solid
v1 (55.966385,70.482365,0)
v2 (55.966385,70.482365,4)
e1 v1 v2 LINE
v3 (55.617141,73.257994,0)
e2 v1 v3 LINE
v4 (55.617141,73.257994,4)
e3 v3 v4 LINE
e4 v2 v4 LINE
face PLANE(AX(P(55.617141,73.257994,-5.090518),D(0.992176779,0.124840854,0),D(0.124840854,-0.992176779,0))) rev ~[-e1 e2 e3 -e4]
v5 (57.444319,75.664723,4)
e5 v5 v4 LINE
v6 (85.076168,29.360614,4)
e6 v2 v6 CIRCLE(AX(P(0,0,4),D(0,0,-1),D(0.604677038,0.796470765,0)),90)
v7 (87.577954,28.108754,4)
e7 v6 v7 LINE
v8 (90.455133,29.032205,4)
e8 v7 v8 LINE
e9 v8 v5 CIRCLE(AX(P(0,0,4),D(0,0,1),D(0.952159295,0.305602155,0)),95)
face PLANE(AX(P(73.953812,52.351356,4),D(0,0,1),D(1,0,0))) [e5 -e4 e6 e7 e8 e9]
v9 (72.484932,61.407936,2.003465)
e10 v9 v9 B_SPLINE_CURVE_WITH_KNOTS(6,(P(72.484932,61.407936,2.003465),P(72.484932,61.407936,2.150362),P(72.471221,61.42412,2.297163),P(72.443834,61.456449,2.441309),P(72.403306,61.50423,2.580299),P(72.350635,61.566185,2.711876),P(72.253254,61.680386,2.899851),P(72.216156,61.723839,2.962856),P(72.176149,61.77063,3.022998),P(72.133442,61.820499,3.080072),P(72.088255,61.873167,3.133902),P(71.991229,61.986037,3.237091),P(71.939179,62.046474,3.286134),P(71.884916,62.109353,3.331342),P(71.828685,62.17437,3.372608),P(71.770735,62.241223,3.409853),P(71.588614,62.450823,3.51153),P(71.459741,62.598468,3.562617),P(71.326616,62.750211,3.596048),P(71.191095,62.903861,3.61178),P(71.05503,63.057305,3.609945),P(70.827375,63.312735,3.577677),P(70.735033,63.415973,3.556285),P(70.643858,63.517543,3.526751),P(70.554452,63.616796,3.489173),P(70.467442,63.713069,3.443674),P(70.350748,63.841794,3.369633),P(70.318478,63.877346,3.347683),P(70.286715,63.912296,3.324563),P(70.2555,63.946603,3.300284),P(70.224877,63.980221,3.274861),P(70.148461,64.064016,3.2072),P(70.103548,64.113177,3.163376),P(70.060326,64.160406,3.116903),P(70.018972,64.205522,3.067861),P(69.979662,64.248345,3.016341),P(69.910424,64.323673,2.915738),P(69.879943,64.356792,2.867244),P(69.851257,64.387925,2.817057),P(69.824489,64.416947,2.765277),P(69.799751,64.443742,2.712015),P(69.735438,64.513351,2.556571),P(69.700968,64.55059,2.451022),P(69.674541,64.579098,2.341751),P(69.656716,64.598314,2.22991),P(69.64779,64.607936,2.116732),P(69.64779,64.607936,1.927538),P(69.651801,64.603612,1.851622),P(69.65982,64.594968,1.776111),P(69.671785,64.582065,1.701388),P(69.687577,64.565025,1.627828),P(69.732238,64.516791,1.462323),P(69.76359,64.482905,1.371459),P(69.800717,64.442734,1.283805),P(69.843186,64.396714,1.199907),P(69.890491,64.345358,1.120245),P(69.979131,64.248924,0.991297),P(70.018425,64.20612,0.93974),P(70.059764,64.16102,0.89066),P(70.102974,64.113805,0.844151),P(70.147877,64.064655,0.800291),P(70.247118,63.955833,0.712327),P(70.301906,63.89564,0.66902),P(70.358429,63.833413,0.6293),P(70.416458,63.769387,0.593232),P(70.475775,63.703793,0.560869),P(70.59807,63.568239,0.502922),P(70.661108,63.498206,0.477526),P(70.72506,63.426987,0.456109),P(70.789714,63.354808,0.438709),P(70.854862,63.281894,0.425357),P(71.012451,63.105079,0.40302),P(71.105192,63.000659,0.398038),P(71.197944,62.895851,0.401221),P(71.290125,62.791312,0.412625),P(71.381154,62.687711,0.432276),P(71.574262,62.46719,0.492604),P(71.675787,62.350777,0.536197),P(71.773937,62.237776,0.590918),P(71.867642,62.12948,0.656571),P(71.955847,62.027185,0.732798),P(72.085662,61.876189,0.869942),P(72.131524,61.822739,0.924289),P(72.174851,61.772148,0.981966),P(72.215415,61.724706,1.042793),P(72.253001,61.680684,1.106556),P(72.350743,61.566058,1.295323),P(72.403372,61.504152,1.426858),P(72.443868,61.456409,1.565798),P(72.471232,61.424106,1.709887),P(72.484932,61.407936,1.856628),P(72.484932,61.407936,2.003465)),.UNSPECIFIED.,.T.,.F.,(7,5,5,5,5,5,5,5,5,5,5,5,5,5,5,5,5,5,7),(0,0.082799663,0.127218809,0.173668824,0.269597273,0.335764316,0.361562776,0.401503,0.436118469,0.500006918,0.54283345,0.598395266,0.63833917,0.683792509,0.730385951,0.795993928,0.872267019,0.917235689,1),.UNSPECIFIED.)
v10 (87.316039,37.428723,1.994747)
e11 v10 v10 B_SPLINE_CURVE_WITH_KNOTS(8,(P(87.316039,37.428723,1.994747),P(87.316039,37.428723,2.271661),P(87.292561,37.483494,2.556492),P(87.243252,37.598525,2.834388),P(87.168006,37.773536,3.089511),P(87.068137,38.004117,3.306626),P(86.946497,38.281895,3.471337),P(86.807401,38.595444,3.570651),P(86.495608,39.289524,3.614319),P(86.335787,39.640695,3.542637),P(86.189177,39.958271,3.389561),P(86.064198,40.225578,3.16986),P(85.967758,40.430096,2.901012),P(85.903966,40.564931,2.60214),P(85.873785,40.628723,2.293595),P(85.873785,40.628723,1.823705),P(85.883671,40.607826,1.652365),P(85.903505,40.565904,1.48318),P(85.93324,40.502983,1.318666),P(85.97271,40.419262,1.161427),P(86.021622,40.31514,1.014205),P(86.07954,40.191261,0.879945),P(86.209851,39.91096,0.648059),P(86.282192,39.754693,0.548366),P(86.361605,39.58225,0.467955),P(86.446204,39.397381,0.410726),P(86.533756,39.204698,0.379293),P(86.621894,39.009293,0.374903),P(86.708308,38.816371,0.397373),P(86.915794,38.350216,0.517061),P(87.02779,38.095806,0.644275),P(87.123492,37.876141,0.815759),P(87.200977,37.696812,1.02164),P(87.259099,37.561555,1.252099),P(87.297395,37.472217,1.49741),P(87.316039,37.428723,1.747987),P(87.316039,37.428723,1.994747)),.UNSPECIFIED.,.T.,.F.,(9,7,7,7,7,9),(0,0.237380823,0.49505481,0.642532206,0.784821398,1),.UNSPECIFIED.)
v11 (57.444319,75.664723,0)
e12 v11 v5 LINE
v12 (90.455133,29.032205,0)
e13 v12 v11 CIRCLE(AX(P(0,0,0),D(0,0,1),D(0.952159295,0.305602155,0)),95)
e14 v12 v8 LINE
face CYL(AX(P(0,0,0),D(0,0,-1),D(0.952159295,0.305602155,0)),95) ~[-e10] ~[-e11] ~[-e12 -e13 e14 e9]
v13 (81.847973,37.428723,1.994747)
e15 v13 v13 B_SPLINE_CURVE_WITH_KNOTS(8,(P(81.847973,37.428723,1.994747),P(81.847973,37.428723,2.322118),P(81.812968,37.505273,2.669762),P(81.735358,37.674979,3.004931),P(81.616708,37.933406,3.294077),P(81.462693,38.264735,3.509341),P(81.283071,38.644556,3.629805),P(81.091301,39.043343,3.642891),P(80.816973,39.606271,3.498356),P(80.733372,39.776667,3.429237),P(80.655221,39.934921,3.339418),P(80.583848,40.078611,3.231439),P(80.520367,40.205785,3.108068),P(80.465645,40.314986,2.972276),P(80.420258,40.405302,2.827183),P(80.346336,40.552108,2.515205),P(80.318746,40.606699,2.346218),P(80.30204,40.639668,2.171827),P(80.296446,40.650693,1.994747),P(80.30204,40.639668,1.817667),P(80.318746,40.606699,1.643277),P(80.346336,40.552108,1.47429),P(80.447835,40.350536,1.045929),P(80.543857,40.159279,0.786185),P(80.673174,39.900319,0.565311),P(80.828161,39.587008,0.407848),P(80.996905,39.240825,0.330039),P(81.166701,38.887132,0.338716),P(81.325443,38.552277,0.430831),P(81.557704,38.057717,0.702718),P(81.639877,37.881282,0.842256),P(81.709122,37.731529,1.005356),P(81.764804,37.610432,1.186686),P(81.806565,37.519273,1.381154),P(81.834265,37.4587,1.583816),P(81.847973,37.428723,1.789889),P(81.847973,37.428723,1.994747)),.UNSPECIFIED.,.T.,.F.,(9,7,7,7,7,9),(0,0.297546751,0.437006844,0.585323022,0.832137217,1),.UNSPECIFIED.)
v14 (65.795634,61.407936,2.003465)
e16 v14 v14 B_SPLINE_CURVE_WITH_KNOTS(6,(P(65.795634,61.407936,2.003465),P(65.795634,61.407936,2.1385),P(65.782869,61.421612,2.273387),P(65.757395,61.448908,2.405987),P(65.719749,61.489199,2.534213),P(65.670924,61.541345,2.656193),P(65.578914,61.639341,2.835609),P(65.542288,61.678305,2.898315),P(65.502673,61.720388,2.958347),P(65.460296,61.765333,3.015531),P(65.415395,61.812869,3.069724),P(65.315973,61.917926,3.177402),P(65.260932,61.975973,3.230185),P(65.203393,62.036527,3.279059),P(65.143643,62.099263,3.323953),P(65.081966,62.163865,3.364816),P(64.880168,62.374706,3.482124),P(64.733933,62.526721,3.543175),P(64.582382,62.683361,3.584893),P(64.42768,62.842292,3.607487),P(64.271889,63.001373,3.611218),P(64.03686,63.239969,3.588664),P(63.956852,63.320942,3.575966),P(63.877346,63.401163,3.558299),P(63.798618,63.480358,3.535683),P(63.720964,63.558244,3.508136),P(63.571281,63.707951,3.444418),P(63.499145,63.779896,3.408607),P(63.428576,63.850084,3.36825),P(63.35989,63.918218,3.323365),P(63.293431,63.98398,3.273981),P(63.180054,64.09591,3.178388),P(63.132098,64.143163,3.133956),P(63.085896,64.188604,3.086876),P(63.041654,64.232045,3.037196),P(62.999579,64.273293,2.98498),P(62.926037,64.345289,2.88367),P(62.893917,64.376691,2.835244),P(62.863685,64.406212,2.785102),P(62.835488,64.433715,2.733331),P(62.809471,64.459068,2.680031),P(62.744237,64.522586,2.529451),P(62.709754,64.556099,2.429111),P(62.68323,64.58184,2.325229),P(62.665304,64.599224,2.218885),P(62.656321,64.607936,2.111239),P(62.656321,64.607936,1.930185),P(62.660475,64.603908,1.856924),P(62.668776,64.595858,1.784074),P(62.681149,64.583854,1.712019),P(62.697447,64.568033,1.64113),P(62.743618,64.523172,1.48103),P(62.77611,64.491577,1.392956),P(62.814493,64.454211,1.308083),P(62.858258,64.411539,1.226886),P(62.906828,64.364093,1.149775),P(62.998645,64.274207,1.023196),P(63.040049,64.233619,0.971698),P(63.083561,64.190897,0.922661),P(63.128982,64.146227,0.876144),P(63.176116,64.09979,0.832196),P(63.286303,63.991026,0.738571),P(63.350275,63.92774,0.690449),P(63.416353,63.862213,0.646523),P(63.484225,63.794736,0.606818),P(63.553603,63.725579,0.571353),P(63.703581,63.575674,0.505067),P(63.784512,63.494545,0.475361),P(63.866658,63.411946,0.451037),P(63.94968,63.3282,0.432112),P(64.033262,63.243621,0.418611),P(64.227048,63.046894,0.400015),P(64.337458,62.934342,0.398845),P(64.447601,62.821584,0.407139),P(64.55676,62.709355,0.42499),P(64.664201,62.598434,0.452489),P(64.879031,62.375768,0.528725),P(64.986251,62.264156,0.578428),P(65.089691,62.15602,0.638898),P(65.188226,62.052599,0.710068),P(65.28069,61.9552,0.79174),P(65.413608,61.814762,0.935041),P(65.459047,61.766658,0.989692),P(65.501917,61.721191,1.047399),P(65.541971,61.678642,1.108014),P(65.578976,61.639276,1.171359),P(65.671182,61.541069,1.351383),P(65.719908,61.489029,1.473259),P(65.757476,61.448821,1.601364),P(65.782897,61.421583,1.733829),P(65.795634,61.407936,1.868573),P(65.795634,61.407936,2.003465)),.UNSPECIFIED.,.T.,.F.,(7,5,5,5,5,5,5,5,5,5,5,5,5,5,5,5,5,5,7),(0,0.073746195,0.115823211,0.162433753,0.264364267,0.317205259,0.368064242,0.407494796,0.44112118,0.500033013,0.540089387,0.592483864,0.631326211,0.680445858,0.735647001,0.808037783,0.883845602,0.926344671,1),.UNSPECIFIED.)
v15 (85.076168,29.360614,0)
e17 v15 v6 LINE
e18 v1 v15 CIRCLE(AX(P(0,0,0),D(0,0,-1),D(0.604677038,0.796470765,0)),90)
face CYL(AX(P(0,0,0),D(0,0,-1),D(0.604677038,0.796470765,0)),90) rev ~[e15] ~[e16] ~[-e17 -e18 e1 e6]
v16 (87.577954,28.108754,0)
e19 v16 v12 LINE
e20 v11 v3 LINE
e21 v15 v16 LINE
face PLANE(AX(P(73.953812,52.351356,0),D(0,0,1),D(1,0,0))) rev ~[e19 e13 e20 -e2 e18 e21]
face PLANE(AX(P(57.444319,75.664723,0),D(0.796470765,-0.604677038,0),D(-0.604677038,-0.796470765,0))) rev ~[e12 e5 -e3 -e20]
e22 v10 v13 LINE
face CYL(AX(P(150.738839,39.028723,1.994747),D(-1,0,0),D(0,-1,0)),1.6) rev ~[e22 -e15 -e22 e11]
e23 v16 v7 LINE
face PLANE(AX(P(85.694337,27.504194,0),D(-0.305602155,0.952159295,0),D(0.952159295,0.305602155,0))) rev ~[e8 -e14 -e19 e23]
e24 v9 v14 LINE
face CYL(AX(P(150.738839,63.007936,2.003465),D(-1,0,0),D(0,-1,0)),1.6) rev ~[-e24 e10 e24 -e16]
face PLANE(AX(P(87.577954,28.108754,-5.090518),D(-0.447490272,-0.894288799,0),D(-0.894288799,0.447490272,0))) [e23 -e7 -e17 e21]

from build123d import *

# Parameters (mm, degrees)
F1_DEPTH    = 4
F4_D        = 3.2
F5_T1_DEPTH = 14.1810362517


# Not quite as in the source:
# - a fillet or chamfer that OpenCascade refuses, or shapes differently, is made with other operations: its cross-section is extruded or revolved along the edge and cut away or added


with BuildPart() as f1:
    # F0 (on Top) → F1 (new body)
    with BuildSketch(Plane.XY):
        with BuildLine():
            ThreePointArc((54.4209333808, 71.682368892), (73.4574706888, 52), (85.6943365292, 27.5041939859))
            Line((85.6943365292, 27.5041939859), (90.4551330031, 29.0322047629))
            ThreePointArc((90.4551330031, 29.0322047629), (77.5384412827, 54.8888888889), (57.4443185686, 75.6647227193))
            Line((57.4443185686, 75.6647227193), (54.4209333808, 71.682368892))
        make_face()
    extrude(amount=F1_DEPTH)

    # F4 (through all)
    with Locations(Plane.YZ.offset(90.457)):
        with Locations((39.0287227929, 1.9947474357), (63.0079358816, 2.0034648478)):
            Hole(F4_D / 2)

    # F5: chamfer of 2 on 2 edges, made by hand

    # F5_s2 → F5_t1 (cut)
    with BuildSketch(Plane.XY.offset(-5.0905181258)):
        with BuildLine():
            Line((87.5779535576, 28.1087539864), (85.0761677414, 29.3606144765))
            ThreePointArc((85.0761677414, 29.3606144765), (85.3813536757, 28.4609283843), (85.6943365292, 27.5041939859))
            Line((85.6943365292, 27.5041939859), (87.5779535576, 28.1087539864))
        make_face()
        with BuildLine():
            Line((55.6171407495, 73.2579937949), (55.9663848396, 70.4823649432))
            ThreePointArc((55.9663848396, 70.4823649432), (55.2192662472, 71.0692101766), (54.4209333808, 71.682368892))
            Line((54.4209333808, 71.682368892), (55.6171407495, 73.2579937949))
        make_face()
    extrude(amount=F5_T1_DEPTH, mode=Mode.SUBTRACT)


solid = f1.part
